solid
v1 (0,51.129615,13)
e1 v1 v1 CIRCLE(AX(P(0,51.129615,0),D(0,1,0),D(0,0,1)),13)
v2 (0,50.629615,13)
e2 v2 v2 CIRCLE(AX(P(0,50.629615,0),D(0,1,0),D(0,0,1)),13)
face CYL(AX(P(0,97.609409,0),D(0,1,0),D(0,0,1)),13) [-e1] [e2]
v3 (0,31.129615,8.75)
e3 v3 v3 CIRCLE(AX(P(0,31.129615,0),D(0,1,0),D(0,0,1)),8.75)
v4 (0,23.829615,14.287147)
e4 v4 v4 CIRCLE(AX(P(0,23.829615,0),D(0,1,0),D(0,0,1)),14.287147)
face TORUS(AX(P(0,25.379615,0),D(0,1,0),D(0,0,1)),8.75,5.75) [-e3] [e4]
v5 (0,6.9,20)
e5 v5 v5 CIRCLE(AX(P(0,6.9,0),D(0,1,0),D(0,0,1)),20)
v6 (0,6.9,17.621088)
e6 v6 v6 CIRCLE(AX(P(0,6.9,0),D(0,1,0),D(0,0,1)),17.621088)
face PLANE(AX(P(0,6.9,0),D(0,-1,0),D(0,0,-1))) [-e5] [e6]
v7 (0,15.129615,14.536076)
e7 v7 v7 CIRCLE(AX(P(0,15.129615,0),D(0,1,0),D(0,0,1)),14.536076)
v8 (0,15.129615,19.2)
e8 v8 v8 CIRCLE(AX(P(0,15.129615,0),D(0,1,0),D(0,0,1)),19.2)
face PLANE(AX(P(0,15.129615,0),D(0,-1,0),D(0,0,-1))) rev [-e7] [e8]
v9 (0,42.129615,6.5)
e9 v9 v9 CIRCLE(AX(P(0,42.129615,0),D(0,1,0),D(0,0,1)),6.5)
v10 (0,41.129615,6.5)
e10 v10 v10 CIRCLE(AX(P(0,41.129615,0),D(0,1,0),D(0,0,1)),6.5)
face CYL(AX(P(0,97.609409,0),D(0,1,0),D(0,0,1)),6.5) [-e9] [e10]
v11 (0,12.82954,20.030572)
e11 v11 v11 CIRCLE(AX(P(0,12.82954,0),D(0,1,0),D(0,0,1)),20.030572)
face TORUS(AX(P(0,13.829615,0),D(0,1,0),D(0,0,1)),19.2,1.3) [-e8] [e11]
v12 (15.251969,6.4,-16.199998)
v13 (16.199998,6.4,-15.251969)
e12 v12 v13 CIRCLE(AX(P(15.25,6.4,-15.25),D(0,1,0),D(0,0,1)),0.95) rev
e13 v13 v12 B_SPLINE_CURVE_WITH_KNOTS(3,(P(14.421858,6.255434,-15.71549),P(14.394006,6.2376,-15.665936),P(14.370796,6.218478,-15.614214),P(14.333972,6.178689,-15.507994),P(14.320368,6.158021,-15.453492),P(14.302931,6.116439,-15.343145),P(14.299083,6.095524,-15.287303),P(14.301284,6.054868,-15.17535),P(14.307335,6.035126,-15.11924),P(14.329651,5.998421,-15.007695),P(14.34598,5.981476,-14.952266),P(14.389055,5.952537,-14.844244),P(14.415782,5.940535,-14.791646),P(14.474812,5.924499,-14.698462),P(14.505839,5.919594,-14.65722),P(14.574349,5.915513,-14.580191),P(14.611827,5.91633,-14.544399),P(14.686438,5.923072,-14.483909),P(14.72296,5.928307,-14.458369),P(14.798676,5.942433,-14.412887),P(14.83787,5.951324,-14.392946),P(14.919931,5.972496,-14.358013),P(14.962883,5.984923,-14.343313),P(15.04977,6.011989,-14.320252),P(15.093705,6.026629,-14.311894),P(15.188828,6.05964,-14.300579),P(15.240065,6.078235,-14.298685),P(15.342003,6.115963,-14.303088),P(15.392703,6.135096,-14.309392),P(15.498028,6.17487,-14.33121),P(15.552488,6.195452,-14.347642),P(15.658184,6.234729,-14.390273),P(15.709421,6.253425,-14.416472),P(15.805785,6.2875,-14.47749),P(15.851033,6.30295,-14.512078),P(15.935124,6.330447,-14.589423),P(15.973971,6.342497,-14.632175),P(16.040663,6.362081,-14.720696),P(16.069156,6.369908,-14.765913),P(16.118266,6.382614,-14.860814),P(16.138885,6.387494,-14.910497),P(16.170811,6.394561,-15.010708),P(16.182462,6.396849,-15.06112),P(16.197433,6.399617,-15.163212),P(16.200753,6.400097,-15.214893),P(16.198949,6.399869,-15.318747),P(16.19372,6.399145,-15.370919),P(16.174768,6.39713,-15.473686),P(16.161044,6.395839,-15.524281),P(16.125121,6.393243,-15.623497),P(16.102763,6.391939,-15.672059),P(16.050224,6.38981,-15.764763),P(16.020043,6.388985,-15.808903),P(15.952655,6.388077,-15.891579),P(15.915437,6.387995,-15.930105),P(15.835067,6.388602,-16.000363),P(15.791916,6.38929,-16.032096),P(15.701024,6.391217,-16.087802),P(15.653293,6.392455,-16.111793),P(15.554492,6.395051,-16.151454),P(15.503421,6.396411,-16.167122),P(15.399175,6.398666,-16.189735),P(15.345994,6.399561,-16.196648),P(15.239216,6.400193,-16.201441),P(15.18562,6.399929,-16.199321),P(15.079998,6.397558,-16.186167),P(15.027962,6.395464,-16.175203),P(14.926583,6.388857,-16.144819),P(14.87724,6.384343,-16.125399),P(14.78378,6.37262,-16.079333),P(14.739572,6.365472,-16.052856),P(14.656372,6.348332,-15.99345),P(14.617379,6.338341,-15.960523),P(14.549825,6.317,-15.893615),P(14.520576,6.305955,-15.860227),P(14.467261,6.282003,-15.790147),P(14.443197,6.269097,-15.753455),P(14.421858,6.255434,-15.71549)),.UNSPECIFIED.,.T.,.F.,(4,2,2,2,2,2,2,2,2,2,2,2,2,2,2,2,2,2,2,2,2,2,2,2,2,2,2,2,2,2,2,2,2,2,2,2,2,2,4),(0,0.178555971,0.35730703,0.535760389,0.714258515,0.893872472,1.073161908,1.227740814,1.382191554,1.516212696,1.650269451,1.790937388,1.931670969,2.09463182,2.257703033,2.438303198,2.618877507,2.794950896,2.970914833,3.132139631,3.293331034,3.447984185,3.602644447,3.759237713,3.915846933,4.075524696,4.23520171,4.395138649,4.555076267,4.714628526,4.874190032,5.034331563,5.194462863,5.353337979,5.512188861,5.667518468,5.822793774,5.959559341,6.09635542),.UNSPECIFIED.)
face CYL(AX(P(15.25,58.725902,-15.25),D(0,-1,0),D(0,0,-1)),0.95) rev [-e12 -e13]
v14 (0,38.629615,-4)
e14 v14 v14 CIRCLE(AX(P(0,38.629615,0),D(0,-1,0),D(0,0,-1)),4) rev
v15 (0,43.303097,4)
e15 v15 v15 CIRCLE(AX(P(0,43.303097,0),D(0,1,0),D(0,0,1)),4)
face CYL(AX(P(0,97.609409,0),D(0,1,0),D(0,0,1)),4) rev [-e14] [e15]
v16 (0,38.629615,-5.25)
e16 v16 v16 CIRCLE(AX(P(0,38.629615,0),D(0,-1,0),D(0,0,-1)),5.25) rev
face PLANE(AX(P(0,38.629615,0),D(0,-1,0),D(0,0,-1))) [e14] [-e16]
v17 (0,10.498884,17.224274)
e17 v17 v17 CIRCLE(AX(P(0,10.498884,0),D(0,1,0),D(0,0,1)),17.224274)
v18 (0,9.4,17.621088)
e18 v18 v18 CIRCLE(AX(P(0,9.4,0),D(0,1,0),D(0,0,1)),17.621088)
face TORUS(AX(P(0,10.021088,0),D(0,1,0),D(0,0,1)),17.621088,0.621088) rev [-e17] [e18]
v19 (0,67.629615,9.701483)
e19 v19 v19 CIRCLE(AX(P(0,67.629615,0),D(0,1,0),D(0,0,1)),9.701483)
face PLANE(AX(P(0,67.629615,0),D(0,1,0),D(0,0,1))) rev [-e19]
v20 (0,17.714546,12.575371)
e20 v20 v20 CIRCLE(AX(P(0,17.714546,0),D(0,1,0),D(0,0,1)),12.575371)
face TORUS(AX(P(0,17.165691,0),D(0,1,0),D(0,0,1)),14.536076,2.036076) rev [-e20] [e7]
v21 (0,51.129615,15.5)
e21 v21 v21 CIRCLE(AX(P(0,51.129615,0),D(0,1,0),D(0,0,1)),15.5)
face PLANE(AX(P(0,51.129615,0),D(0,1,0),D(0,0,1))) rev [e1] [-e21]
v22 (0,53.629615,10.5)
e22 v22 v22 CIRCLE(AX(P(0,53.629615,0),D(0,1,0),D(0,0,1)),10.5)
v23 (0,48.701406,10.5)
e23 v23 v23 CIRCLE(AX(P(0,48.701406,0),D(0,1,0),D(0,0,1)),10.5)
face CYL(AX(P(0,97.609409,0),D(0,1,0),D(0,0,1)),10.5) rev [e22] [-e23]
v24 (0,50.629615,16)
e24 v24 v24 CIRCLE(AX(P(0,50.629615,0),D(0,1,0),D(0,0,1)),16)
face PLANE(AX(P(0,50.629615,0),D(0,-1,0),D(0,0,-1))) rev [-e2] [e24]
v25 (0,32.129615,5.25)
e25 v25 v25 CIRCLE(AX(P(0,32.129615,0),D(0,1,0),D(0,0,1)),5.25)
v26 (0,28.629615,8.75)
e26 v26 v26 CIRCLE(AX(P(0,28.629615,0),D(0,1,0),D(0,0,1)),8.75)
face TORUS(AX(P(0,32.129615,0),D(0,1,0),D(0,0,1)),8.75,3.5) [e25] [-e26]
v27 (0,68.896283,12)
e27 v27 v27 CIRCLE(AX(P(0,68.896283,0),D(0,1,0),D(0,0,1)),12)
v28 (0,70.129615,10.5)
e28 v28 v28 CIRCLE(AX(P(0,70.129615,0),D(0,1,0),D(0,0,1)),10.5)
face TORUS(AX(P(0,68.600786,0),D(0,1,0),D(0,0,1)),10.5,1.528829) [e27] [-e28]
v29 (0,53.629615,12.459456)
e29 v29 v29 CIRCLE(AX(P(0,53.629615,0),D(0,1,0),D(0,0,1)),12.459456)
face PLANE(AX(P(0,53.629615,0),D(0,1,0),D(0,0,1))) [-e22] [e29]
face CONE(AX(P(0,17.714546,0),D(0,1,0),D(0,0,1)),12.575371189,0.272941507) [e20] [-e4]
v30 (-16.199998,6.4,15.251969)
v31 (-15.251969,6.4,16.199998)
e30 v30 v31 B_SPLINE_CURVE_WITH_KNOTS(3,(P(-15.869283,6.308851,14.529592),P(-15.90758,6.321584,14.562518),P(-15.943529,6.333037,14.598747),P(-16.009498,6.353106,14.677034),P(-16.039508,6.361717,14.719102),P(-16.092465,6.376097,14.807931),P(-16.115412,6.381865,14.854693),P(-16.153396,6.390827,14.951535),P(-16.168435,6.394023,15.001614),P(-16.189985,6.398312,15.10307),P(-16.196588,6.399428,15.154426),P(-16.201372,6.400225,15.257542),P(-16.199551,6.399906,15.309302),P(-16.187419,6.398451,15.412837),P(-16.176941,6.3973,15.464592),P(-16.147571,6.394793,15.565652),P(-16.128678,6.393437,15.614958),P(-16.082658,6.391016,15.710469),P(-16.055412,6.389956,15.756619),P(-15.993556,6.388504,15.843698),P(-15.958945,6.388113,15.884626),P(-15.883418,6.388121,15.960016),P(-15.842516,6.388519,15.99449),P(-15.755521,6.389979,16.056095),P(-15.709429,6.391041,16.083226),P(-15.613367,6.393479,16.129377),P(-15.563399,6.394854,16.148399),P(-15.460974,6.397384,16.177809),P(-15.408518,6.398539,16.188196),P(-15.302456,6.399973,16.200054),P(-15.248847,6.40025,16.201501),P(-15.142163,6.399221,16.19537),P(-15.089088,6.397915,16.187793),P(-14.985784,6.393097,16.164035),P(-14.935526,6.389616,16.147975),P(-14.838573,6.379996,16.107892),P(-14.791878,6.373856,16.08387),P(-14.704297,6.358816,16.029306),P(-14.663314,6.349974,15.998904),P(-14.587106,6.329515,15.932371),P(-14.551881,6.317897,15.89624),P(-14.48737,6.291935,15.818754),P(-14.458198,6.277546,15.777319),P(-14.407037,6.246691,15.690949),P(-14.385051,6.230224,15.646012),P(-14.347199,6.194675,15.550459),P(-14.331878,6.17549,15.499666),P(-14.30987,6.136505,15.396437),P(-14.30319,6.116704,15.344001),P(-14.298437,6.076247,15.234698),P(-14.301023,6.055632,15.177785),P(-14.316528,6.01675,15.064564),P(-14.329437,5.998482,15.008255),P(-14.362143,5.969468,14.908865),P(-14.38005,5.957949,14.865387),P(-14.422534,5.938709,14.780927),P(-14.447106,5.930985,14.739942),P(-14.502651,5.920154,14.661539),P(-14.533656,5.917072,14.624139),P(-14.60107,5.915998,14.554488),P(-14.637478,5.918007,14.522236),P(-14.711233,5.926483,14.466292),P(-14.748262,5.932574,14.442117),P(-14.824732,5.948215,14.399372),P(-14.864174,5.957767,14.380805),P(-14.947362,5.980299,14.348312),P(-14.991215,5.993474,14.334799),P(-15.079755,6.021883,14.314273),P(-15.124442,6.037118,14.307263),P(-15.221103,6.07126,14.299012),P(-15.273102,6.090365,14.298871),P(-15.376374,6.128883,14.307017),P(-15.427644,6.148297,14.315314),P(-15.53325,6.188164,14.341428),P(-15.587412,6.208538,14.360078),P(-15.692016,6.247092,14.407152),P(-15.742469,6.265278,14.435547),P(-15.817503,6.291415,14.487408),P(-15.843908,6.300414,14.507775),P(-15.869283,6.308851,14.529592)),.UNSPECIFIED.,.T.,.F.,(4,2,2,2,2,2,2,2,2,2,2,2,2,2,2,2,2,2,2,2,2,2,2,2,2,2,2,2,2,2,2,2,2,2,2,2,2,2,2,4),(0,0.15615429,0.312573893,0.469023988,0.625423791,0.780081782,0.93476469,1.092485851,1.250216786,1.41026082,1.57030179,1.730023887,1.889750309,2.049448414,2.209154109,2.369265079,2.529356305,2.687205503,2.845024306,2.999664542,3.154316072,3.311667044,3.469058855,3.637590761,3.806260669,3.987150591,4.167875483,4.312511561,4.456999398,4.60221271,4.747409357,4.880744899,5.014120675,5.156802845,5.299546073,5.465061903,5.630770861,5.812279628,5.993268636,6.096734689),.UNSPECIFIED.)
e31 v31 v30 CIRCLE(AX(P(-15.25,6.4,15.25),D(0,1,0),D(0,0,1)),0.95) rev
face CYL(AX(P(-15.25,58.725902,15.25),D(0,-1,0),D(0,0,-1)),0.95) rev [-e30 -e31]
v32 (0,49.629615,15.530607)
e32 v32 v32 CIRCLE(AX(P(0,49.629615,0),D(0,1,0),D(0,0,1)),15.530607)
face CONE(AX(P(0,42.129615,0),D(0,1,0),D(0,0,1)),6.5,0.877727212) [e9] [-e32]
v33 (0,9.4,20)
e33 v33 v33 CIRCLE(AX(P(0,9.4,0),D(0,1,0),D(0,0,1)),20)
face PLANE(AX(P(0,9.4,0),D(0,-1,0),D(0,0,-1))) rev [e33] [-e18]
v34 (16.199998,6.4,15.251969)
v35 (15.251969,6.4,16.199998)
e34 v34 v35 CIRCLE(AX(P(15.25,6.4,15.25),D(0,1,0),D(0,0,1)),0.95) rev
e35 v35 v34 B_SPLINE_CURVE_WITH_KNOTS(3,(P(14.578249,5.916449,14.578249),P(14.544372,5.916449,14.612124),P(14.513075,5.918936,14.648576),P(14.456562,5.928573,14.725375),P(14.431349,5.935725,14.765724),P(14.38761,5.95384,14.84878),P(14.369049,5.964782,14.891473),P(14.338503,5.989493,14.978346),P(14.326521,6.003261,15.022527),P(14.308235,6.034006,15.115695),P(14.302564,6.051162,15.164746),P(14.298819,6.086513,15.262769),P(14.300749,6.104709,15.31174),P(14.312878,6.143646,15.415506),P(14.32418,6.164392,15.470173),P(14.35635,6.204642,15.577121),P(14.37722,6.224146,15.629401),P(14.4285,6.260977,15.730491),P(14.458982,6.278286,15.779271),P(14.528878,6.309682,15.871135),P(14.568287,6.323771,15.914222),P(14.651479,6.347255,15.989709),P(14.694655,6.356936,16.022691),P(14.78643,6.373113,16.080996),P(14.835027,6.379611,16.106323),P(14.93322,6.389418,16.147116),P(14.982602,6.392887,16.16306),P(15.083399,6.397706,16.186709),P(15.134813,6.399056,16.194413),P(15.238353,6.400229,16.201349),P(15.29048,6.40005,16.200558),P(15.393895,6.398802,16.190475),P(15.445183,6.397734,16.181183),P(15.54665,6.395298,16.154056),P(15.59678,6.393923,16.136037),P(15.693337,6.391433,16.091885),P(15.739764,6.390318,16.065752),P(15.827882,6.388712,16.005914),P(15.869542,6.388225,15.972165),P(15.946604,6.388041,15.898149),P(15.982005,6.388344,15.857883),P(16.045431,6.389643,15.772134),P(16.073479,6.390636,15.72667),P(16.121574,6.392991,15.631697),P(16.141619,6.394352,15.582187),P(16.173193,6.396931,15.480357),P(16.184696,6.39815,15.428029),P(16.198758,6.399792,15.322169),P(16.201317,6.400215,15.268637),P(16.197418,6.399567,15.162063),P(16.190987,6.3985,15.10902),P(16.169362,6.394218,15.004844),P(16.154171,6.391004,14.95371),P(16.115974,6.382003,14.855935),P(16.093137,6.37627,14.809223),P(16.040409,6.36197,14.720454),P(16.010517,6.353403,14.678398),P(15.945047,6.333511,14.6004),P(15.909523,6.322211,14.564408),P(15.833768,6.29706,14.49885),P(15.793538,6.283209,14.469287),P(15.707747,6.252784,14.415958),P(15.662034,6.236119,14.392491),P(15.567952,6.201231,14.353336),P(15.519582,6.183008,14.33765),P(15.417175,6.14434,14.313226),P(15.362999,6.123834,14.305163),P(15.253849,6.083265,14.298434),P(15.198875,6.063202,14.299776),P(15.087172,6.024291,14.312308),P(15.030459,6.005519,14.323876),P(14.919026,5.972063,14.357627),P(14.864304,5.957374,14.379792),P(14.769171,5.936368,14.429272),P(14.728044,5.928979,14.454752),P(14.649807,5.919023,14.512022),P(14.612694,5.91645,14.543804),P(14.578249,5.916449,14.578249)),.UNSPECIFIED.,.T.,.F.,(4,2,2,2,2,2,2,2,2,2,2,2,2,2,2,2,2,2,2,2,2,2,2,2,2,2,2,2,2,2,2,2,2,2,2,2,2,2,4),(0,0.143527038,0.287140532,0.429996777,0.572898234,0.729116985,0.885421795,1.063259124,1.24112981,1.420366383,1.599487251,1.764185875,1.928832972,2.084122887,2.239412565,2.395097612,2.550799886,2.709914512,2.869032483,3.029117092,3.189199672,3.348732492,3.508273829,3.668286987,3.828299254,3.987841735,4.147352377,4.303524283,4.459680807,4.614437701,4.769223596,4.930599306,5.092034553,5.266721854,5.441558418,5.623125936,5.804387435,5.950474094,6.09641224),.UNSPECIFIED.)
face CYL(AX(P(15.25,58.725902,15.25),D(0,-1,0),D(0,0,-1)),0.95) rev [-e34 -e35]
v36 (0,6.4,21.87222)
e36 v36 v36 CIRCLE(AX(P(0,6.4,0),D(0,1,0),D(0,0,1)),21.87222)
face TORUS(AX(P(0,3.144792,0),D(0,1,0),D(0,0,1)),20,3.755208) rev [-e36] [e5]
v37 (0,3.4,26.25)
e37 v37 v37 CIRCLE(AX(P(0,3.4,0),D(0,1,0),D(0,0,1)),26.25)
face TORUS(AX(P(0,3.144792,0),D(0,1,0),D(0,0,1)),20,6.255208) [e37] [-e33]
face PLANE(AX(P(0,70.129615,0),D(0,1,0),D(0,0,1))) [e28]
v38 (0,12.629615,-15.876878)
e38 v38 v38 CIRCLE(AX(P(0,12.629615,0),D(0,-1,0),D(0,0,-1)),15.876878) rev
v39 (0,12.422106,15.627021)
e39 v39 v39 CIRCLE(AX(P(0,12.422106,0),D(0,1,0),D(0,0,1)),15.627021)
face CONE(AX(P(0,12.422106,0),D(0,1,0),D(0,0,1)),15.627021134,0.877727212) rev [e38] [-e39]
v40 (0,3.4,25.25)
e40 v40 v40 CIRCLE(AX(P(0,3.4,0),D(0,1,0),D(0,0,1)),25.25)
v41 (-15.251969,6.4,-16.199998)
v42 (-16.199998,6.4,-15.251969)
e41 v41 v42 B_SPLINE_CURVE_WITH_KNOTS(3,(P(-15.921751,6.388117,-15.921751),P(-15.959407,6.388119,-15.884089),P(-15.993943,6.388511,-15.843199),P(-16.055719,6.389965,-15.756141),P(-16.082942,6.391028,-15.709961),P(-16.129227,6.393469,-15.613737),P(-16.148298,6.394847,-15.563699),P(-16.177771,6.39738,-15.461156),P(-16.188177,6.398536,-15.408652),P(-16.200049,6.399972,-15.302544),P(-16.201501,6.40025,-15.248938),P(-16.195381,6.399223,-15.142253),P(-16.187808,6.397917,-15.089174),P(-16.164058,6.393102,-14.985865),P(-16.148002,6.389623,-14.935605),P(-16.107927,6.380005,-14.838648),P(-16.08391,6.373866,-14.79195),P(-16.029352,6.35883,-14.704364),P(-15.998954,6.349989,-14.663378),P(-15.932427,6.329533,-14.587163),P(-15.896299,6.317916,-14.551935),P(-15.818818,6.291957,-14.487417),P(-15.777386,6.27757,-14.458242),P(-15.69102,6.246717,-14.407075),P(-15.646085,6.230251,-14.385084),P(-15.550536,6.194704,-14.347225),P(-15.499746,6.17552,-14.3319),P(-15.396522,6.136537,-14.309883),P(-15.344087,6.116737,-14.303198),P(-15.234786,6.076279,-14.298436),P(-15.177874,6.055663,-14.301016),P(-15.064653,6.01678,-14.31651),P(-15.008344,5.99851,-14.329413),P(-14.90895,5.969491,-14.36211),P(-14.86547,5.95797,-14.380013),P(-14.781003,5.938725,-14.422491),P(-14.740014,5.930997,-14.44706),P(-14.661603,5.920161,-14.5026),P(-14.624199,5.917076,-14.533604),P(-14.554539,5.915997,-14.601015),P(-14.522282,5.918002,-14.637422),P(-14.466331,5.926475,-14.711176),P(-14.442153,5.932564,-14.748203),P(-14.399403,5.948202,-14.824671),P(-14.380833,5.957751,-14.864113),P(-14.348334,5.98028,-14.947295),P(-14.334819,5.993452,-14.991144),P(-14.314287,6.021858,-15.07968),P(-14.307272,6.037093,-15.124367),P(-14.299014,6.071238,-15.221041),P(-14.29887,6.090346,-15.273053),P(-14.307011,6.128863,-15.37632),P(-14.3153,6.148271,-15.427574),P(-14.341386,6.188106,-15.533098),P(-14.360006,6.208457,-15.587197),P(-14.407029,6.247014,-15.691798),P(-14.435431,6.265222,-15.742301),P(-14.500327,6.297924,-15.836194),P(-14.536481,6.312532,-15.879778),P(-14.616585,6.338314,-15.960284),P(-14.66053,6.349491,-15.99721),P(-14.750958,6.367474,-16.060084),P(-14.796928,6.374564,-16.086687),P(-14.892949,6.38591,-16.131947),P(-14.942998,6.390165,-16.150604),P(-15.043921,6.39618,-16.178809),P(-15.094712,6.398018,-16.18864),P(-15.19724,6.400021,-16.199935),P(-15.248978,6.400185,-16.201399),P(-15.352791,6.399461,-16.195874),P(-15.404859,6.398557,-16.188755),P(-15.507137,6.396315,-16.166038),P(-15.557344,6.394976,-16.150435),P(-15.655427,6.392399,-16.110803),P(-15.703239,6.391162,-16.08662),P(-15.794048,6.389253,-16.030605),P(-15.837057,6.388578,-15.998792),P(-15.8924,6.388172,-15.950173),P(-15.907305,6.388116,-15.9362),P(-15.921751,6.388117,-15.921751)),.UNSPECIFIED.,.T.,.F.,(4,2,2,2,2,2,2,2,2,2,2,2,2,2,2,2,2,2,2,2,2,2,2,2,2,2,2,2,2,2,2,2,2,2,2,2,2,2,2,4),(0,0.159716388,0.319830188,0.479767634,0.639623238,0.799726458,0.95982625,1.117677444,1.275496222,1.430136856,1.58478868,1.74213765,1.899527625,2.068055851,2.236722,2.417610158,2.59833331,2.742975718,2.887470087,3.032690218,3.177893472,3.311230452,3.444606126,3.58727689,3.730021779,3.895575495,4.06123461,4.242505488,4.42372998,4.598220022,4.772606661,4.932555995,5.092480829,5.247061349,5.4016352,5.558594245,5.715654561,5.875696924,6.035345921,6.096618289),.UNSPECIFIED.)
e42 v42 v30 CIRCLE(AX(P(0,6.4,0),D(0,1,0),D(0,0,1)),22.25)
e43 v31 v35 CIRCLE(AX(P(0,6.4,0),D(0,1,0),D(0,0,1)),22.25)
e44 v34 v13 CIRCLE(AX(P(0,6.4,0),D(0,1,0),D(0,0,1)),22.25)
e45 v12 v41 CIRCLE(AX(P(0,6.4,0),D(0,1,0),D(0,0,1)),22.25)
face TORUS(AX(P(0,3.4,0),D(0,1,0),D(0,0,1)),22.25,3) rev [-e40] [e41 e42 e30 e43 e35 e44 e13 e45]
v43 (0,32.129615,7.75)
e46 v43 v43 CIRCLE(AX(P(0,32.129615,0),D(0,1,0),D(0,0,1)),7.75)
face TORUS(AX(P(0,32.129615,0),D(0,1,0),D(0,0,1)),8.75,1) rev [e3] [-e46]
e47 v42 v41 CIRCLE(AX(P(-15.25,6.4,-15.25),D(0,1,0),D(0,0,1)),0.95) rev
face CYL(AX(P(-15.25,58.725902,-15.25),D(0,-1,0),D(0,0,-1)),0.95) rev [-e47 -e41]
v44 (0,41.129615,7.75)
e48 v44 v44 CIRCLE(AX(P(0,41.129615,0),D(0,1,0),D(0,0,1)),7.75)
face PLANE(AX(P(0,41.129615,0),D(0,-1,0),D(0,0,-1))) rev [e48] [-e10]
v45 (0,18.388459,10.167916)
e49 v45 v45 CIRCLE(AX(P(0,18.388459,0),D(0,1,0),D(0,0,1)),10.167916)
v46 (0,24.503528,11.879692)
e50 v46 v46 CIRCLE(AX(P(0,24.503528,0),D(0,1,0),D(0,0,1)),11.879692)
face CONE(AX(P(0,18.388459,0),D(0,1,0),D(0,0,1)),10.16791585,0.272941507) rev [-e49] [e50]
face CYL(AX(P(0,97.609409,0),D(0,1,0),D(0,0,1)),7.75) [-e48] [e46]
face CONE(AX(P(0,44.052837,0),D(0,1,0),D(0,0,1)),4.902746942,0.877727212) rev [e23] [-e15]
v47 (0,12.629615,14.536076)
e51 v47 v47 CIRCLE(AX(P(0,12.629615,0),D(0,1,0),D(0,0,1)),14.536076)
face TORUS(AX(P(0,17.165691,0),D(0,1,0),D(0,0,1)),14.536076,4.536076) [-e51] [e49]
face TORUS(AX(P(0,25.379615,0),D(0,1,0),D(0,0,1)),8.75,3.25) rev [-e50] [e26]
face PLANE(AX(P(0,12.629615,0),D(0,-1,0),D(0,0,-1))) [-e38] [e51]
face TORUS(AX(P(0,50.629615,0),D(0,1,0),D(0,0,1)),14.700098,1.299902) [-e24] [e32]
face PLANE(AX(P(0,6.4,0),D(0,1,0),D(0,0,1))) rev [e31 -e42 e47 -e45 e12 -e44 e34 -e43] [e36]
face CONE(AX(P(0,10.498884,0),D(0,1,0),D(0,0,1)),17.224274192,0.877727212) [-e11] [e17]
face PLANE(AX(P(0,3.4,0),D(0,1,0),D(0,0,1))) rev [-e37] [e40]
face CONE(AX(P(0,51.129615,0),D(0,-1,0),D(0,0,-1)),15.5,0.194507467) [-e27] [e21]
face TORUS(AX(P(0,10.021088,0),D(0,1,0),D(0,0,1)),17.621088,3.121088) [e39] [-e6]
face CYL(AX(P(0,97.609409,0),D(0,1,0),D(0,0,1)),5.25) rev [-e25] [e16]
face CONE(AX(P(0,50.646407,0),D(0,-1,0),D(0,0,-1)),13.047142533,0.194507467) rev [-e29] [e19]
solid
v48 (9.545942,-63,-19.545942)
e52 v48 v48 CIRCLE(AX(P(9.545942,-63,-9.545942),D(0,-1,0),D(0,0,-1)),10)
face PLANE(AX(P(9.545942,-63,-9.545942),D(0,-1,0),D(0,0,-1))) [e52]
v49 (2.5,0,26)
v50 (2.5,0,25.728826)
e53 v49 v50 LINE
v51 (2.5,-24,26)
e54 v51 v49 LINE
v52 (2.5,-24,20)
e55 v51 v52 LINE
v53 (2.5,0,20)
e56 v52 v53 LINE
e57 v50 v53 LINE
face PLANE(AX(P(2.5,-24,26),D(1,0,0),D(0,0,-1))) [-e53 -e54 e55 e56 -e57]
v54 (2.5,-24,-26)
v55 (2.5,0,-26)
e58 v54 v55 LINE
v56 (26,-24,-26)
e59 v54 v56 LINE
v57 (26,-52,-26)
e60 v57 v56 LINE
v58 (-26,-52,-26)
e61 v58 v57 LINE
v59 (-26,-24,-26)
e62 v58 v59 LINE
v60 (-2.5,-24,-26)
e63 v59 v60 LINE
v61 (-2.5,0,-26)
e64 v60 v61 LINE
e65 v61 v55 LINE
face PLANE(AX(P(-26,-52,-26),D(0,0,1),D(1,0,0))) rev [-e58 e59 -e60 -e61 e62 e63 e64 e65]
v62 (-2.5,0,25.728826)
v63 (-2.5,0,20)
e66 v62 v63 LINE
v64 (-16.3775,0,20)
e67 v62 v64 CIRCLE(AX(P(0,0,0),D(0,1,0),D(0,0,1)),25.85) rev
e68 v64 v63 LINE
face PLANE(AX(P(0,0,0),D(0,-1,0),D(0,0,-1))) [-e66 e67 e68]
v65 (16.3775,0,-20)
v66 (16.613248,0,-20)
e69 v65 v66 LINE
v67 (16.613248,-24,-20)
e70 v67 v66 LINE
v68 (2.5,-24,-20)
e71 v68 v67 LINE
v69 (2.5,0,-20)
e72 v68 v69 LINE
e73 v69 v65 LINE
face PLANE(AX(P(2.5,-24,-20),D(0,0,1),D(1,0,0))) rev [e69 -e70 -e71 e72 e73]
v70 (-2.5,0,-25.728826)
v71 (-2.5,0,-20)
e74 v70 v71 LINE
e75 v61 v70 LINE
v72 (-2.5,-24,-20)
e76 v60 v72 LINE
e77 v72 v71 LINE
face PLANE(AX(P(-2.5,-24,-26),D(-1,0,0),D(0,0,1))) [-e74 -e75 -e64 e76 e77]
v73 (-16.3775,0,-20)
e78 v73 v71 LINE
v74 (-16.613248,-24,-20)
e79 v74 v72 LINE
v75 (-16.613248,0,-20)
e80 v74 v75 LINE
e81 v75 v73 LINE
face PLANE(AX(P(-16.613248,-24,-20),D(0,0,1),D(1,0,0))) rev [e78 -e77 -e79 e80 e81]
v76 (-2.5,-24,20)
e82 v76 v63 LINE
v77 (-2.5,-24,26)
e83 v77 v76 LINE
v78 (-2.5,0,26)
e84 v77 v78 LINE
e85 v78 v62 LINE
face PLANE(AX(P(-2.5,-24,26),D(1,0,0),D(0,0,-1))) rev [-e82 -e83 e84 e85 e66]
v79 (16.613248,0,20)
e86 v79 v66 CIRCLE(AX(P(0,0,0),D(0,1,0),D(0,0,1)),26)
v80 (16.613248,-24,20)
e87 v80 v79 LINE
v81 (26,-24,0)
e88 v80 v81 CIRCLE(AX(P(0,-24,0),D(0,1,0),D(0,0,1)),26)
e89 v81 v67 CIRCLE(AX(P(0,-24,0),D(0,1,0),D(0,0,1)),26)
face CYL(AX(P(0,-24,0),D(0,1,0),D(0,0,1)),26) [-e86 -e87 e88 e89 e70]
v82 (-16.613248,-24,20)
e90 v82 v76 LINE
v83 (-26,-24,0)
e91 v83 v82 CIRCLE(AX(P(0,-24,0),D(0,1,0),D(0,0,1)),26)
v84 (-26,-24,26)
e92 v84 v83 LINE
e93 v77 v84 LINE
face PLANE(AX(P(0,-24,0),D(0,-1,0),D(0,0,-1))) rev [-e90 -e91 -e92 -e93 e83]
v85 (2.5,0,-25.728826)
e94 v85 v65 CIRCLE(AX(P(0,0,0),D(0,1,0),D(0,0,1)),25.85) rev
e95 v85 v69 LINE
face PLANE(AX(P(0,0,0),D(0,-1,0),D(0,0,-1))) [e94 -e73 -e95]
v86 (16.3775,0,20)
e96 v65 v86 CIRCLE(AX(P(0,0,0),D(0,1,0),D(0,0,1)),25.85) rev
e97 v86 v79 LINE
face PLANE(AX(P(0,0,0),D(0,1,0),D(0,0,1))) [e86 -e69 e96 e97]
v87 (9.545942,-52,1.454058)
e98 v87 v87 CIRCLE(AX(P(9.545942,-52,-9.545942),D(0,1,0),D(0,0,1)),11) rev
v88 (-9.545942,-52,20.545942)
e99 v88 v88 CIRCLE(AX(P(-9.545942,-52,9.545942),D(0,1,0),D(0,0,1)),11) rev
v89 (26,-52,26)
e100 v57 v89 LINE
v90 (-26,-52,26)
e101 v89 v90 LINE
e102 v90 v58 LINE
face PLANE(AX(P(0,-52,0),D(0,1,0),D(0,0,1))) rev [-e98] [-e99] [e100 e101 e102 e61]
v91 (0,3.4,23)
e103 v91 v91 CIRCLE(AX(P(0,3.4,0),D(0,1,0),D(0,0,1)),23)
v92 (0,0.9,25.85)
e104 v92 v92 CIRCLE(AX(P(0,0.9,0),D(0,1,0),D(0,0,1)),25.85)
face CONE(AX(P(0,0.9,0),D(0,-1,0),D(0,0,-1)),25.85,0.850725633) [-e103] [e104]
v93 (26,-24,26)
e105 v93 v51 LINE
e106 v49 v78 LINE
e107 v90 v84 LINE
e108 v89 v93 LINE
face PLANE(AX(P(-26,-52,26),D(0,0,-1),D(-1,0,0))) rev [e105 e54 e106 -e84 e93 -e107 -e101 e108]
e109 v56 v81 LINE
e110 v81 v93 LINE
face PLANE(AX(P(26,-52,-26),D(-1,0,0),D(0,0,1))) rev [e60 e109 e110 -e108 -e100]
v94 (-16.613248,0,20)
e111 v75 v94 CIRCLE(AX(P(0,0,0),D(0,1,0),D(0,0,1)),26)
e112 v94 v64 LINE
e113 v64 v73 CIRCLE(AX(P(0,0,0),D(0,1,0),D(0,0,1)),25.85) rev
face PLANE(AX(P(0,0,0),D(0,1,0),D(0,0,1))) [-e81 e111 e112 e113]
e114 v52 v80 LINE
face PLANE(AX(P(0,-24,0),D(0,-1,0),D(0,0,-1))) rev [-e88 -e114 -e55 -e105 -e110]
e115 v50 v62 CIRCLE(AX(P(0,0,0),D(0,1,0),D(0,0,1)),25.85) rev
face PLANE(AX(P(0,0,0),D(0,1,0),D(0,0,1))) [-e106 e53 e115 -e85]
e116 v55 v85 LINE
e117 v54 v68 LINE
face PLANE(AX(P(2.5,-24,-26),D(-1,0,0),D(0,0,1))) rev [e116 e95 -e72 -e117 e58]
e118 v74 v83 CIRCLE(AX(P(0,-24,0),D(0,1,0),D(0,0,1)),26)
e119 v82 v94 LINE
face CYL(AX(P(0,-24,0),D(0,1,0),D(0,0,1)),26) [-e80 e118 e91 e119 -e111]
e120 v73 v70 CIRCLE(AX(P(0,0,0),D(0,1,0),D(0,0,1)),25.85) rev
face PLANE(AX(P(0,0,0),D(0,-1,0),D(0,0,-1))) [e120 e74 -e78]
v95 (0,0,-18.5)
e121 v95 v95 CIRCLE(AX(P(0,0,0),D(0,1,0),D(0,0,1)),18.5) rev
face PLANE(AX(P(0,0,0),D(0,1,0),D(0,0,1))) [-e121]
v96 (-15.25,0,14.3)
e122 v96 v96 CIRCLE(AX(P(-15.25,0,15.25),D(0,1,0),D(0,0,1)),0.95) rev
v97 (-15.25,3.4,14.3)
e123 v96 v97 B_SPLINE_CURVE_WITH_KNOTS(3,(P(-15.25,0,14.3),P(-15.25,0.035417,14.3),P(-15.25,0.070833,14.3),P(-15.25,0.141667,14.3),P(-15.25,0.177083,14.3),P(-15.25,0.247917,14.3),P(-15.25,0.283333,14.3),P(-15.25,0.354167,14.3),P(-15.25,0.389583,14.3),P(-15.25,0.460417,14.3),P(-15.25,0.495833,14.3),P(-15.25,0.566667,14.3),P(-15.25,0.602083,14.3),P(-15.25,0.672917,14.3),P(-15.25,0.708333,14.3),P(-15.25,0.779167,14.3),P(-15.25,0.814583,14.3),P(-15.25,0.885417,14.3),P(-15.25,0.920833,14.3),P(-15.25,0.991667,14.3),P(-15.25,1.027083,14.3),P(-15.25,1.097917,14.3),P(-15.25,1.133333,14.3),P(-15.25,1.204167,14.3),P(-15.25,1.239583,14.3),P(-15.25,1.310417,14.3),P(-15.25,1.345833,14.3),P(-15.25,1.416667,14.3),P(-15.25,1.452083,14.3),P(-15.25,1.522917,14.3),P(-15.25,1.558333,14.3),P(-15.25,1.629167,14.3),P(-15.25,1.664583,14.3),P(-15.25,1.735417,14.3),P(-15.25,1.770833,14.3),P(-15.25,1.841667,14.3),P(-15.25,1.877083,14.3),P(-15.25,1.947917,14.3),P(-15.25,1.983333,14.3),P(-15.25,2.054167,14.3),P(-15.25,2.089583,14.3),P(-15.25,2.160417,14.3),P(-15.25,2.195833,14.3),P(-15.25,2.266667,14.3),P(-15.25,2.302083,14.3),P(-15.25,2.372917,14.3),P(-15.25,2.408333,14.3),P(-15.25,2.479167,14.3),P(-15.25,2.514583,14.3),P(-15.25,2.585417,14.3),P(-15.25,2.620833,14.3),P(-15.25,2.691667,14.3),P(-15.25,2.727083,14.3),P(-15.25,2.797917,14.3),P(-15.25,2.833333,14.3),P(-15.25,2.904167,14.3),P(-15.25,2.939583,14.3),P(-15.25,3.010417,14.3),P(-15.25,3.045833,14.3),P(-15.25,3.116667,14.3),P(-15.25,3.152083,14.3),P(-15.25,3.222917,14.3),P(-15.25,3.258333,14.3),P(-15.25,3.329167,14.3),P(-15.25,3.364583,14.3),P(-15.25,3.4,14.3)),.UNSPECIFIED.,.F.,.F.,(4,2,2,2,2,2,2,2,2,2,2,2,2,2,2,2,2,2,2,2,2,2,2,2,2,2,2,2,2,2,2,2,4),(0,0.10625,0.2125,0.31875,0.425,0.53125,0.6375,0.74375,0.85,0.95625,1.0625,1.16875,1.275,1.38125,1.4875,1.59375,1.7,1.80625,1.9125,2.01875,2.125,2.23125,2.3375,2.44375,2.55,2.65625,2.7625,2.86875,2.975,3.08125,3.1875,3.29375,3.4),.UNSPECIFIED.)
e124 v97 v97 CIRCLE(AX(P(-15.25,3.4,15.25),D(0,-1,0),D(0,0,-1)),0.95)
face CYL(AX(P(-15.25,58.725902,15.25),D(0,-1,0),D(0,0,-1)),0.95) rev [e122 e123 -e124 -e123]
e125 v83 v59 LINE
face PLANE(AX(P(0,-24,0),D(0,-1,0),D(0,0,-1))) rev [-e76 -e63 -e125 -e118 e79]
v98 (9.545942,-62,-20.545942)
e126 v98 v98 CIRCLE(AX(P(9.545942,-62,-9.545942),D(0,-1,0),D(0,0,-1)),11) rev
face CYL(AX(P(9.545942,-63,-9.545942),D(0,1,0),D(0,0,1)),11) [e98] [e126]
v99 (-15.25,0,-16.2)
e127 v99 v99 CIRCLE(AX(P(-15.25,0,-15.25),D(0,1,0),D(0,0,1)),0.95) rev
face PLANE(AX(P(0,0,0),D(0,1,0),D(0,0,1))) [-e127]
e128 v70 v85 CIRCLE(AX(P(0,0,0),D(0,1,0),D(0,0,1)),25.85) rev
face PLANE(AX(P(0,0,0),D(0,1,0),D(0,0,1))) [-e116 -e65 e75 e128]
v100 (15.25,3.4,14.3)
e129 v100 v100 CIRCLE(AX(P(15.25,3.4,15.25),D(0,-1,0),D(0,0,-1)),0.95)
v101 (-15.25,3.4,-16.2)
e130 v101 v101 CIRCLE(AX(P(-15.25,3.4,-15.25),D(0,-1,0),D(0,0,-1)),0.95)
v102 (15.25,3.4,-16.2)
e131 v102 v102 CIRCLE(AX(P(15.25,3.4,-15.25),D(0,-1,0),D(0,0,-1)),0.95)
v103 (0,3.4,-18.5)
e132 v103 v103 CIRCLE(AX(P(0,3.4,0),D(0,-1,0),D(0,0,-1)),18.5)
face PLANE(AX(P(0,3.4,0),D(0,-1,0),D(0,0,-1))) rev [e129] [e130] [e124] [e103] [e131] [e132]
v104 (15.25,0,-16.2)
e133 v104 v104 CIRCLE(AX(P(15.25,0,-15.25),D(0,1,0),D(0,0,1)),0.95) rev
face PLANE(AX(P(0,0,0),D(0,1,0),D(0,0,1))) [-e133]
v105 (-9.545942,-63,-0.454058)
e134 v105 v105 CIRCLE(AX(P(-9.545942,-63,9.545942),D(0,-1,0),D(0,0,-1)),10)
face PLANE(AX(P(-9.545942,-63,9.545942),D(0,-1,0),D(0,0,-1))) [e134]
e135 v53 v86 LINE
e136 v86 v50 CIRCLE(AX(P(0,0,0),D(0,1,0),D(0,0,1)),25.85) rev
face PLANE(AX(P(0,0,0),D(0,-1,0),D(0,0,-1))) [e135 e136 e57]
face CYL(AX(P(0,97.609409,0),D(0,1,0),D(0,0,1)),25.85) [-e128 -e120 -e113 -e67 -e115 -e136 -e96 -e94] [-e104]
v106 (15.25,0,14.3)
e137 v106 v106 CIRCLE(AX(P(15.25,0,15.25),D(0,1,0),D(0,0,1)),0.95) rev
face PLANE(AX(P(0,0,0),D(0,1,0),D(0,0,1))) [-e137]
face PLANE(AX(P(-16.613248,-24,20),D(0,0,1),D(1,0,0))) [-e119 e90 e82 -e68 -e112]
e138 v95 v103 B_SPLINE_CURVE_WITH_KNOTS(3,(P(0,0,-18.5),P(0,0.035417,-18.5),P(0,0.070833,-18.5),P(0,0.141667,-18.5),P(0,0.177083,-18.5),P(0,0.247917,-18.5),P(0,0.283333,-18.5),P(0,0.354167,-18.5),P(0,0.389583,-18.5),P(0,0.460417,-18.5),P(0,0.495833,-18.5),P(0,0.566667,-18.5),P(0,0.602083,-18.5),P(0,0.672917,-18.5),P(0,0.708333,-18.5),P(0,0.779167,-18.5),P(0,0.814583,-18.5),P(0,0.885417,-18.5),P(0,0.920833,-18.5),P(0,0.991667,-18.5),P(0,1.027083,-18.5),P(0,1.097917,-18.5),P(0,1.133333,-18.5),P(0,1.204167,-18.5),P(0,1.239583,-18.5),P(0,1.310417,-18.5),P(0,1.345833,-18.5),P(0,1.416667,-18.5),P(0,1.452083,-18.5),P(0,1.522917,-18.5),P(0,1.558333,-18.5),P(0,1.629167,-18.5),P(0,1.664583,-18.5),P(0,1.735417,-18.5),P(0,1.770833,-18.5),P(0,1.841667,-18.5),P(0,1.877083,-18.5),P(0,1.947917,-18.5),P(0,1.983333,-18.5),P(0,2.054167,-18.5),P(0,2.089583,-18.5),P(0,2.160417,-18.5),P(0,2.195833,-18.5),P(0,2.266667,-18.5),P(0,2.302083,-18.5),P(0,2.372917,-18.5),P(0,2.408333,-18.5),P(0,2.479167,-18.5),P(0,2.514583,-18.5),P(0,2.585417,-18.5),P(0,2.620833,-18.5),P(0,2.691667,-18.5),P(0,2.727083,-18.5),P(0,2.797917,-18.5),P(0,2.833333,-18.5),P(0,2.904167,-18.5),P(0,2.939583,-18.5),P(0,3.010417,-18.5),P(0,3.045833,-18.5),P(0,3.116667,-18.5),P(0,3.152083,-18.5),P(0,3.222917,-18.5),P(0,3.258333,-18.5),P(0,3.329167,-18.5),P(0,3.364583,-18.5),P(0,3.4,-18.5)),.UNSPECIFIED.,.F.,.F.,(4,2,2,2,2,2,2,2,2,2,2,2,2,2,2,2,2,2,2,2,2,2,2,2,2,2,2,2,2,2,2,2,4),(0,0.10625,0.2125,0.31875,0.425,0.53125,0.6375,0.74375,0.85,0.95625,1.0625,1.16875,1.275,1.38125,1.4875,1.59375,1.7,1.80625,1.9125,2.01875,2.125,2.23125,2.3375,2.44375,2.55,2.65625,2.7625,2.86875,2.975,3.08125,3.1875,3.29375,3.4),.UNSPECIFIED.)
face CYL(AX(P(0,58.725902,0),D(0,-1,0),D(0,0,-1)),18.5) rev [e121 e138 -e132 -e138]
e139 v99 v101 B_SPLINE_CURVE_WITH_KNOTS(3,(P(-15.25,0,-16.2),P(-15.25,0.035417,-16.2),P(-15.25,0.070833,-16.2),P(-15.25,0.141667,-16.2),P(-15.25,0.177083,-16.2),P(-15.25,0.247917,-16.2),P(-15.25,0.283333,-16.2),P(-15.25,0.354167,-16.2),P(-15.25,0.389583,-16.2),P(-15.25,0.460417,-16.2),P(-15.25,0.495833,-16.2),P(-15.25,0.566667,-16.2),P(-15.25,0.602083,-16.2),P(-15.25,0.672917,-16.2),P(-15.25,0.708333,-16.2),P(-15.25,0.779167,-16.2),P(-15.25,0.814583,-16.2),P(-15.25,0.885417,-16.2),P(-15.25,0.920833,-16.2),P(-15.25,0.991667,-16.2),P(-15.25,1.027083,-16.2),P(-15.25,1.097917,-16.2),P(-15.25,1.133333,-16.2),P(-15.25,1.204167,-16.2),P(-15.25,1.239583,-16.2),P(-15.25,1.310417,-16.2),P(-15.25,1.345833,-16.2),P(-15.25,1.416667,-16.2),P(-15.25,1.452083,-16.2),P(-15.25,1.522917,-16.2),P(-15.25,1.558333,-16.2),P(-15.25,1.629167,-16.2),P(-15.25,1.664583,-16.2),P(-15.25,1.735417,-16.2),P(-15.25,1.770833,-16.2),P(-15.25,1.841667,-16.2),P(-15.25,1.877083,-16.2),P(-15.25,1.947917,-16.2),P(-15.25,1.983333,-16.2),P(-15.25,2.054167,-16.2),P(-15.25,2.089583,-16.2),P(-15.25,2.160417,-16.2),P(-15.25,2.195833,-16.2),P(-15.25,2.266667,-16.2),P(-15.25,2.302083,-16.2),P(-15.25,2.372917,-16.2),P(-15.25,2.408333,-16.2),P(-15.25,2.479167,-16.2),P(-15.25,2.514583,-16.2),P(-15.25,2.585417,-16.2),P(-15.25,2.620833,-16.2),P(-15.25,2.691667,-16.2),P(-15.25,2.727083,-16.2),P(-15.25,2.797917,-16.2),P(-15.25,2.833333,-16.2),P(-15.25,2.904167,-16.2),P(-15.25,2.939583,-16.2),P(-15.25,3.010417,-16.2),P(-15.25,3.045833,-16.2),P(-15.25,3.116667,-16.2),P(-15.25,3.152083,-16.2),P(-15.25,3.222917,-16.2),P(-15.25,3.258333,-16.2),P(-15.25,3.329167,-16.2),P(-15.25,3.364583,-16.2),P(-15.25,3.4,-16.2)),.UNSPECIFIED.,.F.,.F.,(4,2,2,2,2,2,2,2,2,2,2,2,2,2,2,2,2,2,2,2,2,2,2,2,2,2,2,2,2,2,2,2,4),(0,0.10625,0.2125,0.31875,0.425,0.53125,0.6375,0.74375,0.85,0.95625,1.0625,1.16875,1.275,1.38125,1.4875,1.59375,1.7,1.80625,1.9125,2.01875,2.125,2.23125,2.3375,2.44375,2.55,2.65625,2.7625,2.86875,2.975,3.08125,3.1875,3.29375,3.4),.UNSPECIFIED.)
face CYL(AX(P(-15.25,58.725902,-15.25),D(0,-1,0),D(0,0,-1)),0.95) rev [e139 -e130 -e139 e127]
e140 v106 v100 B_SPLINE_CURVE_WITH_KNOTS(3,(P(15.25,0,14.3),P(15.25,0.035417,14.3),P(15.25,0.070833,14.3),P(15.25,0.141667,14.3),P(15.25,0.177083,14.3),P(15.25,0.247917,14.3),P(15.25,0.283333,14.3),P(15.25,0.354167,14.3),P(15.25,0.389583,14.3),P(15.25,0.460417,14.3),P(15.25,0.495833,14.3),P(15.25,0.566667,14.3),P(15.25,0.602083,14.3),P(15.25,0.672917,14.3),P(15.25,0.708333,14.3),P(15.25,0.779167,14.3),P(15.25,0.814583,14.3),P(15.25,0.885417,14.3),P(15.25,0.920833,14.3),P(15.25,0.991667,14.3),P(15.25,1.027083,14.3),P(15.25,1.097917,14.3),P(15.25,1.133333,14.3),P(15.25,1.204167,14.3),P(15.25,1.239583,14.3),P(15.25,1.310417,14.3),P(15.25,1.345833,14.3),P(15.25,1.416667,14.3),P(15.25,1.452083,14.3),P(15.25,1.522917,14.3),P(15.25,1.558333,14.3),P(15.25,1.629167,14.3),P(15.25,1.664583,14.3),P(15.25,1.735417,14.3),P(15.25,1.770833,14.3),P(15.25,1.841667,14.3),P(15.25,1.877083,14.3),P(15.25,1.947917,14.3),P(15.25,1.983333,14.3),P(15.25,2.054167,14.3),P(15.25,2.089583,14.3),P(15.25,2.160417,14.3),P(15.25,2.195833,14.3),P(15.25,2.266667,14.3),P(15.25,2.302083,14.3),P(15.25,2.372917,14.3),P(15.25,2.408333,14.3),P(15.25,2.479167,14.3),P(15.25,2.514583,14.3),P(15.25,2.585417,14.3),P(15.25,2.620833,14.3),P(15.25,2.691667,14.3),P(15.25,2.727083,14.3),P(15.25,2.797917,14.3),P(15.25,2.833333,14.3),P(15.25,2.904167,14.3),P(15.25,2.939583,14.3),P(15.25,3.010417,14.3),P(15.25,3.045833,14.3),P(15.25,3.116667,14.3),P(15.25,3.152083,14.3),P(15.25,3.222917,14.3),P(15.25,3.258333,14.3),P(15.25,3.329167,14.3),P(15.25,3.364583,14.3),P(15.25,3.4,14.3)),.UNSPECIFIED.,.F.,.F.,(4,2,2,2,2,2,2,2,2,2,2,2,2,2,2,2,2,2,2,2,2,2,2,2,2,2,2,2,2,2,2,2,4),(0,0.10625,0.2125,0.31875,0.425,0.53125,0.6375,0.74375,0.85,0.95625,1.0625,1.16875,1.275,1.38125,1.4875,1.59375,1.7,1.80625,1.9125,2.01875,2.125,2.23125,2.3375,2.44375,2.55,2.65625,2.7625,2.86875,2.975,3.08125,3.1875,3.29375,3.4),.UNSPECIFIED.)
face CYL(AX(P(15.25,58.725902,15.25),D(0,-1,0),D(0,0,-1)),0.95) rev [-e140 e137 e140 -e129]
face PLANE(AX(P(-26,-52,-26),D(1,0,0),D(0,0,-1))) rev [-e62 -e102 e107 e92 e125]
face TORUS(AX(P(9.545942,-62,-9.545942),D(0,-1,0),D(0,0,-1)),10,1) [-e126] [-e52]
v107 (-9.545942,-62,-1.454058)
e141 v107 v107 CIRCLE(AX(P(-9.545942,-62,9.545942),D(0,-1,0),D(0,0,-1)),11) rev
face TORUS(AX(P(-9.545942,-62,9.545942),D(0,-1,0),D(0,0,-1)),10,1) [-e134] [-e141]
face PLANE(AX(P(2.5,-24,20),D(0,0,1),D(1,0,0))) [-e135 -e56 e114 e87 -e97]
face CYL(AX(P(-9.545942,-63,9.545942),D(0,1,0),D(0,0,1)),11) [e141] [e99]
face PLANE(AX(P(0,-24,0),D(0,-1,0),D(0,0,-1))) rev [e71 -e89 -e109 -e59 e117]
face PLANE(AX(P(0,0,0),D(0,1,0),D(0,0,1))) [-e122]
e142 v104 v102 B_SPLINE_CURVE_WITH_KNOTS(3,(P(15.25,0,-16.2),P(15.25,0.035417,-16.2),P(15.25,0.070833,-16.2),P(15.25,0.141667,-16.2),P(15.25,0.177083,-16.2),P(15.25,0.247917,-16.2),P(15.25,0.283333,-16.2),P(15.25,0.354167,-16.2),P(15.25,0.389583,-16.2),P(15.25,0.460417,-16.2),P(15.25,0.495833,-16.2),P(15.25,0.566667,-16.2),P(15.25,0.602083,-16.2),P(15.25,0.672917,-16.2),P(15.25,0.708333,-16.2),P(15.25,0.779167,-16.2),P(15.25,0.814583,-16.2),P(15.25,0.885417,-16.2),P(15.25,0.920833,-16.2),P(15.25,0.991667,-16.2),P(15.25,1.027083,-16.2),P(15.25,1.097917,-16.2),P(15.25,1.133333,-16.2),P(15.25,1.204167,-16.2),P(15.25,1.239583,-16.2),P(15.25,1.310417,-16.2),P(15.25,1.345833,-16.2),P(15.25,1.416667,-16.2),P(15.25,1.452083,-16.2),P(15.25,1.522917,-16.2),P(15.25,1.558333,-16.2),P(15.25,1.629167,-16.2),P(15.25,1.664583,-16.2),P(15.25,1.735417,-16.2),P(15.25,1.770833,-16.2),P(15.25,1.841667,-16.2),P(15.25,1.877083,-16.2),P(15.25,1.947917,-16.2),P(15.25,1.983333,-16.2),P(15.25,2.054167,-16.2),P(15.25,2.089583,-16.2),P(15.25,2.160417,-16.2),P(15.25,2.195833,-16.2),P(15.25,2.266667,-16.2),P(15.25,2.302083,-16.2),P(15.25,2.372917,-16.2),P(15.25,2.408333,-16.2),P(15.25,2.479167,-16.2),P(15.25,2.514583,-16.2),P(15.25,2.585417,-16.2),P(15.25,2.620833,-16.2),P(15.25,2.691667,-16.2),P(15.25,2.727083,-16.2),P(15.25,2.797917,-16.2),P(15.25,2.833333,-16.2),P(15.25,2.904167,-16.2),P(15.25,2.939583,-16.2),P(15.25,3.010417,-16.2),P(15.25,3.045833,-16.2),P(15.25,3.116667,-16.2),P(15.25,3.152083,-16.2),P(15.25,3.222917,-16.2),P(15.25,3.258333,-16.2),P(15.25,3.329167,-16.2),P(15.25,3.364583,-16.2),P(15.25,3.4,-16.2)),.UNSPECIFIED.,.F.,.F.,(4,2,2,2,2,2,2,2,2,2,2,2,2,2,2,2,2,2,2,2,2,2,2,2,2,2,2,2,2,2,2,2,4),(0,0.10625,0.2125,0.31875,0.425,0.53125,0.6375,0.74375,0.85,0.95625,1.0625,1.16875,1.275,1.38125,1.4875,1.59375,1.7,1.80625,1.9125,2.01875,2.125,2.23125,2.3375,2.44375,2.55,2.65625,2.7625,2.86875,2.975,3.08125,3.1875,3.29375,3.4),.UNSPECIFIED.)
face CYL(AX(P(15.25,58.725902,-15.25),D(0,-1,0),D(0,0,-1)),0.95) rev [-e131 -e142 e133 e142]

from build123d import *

# Parameters (mm, degrees)
SZKIC2_R                    = 18.5
SZKIC2_R_2                  = 0.95
WYTNIJ_WYCI_GNI_CIE1_DEPTH  = 6.4
SZKIC3_R                    = 1
DODANIE_WYCI_GNI_CIE1_DEPTH = 2
SZKIC4_W                    = 52
SZKIC4_H                    = 52
DODANIE_WYCI_GNI_CIE2_DEPTH = 52
SZKIC5_W                    = 60
SZKIC5_H                    = 60
WYTNIJ_WYCI_GNI_CIE4_DEPTH  = 24
SZKIC6_R                    = 11
DODANIE_WYCI_GNI_CIE3_DEPTH = 11
ZAOKR_GLENIE1_R             = 1


# Read off the part's stored shape, not the designer's step: Skorupa2
with BuildPart() as part:
    # Szkic1 → Obrót1 (revolve)
    with BuildSketch(Plane(origin=(0, 0, 0), x_dir=(0, 0, -1), z_dir=(1, 0, 0)), mode=Mode.PRIVATE) as obr_t1_sk:
        with BuildLine():
            Line((15, 6.4), (22.25, 6.4))
            ThreePointArc((22.25, 6.4), (24.371320344, 5.521320344), (25.25, 3.4))
            Line((25.25, 3.4), (26.25, 3.4))
            ThreePointArc((26.25, 3.4), (24.331930863, 7.657219649), (20, 9.4))
            Line((20, 9.4), (17.621088207, 9.4))
            ThreePointArc((17.621088207, 9.4), (17.036920363, 9.810141552), (17.224274192, 10.498884396))
            Line((17.224274192, 10.498884396), (20.03057159, 12.829539524))
            ThreePointArc((20.03057159, 12.829539524), (20.422721971, 14.271147474), (19.2, 15.129614938))
            Line((19.2, 15.129614938), (14.536076105, 15.129614938))
            ThreePointArc((14.536076105, 15.129614938), (12.913868186, 15.935224719), (12.575371189, 17.714546341))
            Line((12.575371189, 17.714546341), (14.28714728, 23.829614938))
            ThreePointArc((14.28714728, 23.829614938), (13.33121163, 28.854525009), (8.75, 31.129614938))
            ThreePointArc((8.75, 31.129614938), (8.042893219, 31.422508157), (7.75, 32.129614938))
            Line((7.75, 32.129614938), (7.75, 41.129614938))
            Line((7.75, 41.129614938), (6.5, 41.129614938))
            Line((6.5, 41.129614938), (6.5, 42.129614938))
            Line((6.5, 42.129614938), (15.530606989, 49.629614938))
            ThreePointArc((15.530606989, 49.629614938), (15.876814938, 50.077272246), (16, 50.629614938))
            Line((16, 50.629614938), (13, 50.629614938))
            Line((13, 50.629614938), (13, 51.129614938))
            Line((13, 51.129614938), (15.5, 51.129614938))
            Line((15.5, 51.129614938), (12, 68.89628295))
            ThreePointArc((12, 68.89628295), (11.470967017, 69.781692906), (10.5, 70.129614938))
            Line((10.5, 70.129614938), (0, 70.129614938))
            Line((0, 70.129614938), (0, 0))
            Line((0, 0), (25.85, 0))
            Line((25.85, 0), (25.85, 0.9))
            Line((25.85, 0.9), (23, 3.4))
            Line((23, 3.4), (15, 3.4))
            Line((15, 3.4), (15, 6.4))
        make_face()
    revolve(obr_t1_sk.sketch.rotate(Axis((0, 97.609409251, 0), (0, -1, 0)), 180), axis=Axis((0, 97.609409251, 0), (0, -1, 0)))

    # Szkic2 → Wytnij-wyciągnięcie1 (cut)
    with BuildSketch(Plane.XZ):
        with Locations(Location((0, 0, 0), (0, 0, 270))):
            Circle(SZKIC2_R)
        with Locations(Location((-15.25, 15.25, 0), (0, 0, 270))):
            Circle(SZKIC2_R_2)
        with Locations(Location((15.25, 15.25, 0), (0, 0, 270))):
            Circle(SZKIC2_R_2)
        with Locations(Location((-15.25, -15.25, 0), (0, 0, 270))):
            Circle(SZKIC2_R_2)
        with Locations(Location((15.25, -15.25, 0), (0, 0, 270))):
            Circle(SZKIC2_R_2)
    extrude(amount=-WYTNIJ_WYCI_GNI_CIE1_DEPTH, mode=Mode.SUBTRACT)


with BuildPart() as wytnij_wyci_gni_cie1_piece_1:
    # of the separate pieces the step leaves, piece 1, a body of its own (wytnij_wyci_gni_cie1_pieces)
    add(part.part.solids().sort_by_distance((0, 6.4, 22.25))[0])

    # Skorupa2 outline → Skorupa2 (revolve, cut)
    with BuildSketch(Plane.XY):
        with BuildLine():
            ThreePointArc((21.872220162, 6.4), (20.968917996, 6.772847281), (20, 6.9))
            Line((20, 6.9), (17.621088207, 6.9))
            ThreePointArc((17.621088207, 6.9), (14.685531957, 8.96104052), (15.627021134, 12.422106346))
            Line((15.627021134, 12.422106346), (15.876878273, 12.629614938))
            Line((15.876878273, 12.629614938), (14.536076105, 12.629614938))
            ThreePointArc((14.536076105, 12.629614938), (10.922037043, 14.424394253), (10.16791585, 18.388459384))
            Line((10.16791585, 18.388459384), (11.879691941, 24.503527981))
            ThreePointArc((11.879691941, 24.503527981), (11.339380487, 27.343694543), (8.75, 28.629614938))
            ThreePointArc((8.75, 28.629614938), (6.275126266, 29.654741204), (5.25, 32.129614938))
            Line((5.25, 32.129614938), (5.25, 38.629614938))
            Line((5.25, 38.629614938), (4, 38.629614938))
            Line((4, 38.629614938), (4, 43.303097466))
            Line((4, 43.303097466), (10.5, 48.701405692))
            Line((10.5, 48.701405692), (10.5, 53.629614938))
            Line((10.5, 53.629614938), (12.459456142, 53.629614938))
            Line((12.459456142, 53.629614938), (9.701482618, 67.629614938))
            Line((9.701482618, 67.629614938), (0, 67.629614938))
            Line((0, 67.629614938), (0, 6.4))
            Line((0, 6.4), (21.872220162, 6.4))
        make_face()
    revolve(axis=Axis((0, 0, 0), (0, 1, 0)), mode=Mode.SUBTRACT)


with BuildPart() as wytnij_wyci_gni_cie1_piece_2:
    # of the separate pieces the step leaves, piece 2, a body of its own (wytnij_wyci_gni_cie1_pieces)
    add(part.part.solids().sort_by_distance((0, 0, 25.85))[0])

    # Szkic3 → Dodanie-wyciągnięcie1 (add)
    with BuildSketch(Plane.XZ):
        with Locations(Location((-22, 0, 0), (0, 0, 90))):
            Circle(SZKIC3_R)
        with Locations(Location((22, 0, 0), (0, 0, 90))):
            Circle(SZKIC3_R)
    extrude(amount=DODANIE_WYCI_GNI_CIE1_DEPTH)

    # Szkic4 → Dodanie-wyciągnięcie2 (add)
    with BuildSketch(Plane.XZ):
        Rectangle(SZKIC4_W, SZKIC4_H)
    extrude(amount=DODANIE_WYCI_GNI_CIE2_DEPTH)

    # Szkic5 → Wytnij-wyciągnięcie4 (cut)
    with BuildSketch(Plane(origin=(0, 0, 0), x_dir=(1, 0, 0), z_dir=(0, 1, 0))):
        Rectangle(SZKIC5_W, SZKIC5_H)
        with BuildLine():
            Line((-16.613247726, 20), (-2.5, 20))
            Line((-2.5, 20), (-2.5, 26))
            Line((-2.5, 26), (2.5, 26))
            Line((2.5, 26), (2.5, 20))
            Line((2.5, 20), (16.613247726, 20))
            ThreePointArc((16.613247726, 20), (26, 0), (16.613247726, -20))
            Line((16.613247726, -20), (2.5, -20))
            Line((2.5, -20), (2.5, -26))
            Line((2.5, -26), (-2.5, -26))
            Line((-2.5, -26), (-2.5, -20))
            Line((-2.5, -20), (-16.613247726, -20))
            ThreePointArc((-16.613247726, -20), (-26, 0), (-16.613247726, 20))
        make_face(mode=Mode.SUBTRACT)
    extrude(amount=-WYTNIJ_WYCI_GNI_CIE4_DEPTH, mode=Mode.SUBTRACT)

    # Szkic6 → Dodanie-wyciągnięcie3 (add)
    with BuildSketch(Plane.XZ.offset(52)):
        with Locations(Location((-9.545941546, 9.545941546, 0), (0, 0, 90))):
            Circle(SZKIC6_R)
        with Locations(Location((9.545941546, -9.545941546, 0), (0, 0, 90))):
            Circle(SZKIC6_R)
    extrude(amount=DODANIE_WYCI_GNI_CIE3_DEPTH)

    # Zaokrąglenie1
    zaokr_glenie1_edges = [wytnij_wyci_gni_cie1_piece_2.edges().sort_by_distance(p)[0] for p in [
        (-9.545941546, -63, -1.454058454),
        (9.545941546, -63, -20.545941546),
    ]]
    fillet(zaokr_glenie1_edges, radius=ZAOKR_GLENIE1_R)


solid = Compound([wytnij_wyci_gni_cie1_piece_1.part, wytnij_wyci_gni_cie1_piece_2.part])
